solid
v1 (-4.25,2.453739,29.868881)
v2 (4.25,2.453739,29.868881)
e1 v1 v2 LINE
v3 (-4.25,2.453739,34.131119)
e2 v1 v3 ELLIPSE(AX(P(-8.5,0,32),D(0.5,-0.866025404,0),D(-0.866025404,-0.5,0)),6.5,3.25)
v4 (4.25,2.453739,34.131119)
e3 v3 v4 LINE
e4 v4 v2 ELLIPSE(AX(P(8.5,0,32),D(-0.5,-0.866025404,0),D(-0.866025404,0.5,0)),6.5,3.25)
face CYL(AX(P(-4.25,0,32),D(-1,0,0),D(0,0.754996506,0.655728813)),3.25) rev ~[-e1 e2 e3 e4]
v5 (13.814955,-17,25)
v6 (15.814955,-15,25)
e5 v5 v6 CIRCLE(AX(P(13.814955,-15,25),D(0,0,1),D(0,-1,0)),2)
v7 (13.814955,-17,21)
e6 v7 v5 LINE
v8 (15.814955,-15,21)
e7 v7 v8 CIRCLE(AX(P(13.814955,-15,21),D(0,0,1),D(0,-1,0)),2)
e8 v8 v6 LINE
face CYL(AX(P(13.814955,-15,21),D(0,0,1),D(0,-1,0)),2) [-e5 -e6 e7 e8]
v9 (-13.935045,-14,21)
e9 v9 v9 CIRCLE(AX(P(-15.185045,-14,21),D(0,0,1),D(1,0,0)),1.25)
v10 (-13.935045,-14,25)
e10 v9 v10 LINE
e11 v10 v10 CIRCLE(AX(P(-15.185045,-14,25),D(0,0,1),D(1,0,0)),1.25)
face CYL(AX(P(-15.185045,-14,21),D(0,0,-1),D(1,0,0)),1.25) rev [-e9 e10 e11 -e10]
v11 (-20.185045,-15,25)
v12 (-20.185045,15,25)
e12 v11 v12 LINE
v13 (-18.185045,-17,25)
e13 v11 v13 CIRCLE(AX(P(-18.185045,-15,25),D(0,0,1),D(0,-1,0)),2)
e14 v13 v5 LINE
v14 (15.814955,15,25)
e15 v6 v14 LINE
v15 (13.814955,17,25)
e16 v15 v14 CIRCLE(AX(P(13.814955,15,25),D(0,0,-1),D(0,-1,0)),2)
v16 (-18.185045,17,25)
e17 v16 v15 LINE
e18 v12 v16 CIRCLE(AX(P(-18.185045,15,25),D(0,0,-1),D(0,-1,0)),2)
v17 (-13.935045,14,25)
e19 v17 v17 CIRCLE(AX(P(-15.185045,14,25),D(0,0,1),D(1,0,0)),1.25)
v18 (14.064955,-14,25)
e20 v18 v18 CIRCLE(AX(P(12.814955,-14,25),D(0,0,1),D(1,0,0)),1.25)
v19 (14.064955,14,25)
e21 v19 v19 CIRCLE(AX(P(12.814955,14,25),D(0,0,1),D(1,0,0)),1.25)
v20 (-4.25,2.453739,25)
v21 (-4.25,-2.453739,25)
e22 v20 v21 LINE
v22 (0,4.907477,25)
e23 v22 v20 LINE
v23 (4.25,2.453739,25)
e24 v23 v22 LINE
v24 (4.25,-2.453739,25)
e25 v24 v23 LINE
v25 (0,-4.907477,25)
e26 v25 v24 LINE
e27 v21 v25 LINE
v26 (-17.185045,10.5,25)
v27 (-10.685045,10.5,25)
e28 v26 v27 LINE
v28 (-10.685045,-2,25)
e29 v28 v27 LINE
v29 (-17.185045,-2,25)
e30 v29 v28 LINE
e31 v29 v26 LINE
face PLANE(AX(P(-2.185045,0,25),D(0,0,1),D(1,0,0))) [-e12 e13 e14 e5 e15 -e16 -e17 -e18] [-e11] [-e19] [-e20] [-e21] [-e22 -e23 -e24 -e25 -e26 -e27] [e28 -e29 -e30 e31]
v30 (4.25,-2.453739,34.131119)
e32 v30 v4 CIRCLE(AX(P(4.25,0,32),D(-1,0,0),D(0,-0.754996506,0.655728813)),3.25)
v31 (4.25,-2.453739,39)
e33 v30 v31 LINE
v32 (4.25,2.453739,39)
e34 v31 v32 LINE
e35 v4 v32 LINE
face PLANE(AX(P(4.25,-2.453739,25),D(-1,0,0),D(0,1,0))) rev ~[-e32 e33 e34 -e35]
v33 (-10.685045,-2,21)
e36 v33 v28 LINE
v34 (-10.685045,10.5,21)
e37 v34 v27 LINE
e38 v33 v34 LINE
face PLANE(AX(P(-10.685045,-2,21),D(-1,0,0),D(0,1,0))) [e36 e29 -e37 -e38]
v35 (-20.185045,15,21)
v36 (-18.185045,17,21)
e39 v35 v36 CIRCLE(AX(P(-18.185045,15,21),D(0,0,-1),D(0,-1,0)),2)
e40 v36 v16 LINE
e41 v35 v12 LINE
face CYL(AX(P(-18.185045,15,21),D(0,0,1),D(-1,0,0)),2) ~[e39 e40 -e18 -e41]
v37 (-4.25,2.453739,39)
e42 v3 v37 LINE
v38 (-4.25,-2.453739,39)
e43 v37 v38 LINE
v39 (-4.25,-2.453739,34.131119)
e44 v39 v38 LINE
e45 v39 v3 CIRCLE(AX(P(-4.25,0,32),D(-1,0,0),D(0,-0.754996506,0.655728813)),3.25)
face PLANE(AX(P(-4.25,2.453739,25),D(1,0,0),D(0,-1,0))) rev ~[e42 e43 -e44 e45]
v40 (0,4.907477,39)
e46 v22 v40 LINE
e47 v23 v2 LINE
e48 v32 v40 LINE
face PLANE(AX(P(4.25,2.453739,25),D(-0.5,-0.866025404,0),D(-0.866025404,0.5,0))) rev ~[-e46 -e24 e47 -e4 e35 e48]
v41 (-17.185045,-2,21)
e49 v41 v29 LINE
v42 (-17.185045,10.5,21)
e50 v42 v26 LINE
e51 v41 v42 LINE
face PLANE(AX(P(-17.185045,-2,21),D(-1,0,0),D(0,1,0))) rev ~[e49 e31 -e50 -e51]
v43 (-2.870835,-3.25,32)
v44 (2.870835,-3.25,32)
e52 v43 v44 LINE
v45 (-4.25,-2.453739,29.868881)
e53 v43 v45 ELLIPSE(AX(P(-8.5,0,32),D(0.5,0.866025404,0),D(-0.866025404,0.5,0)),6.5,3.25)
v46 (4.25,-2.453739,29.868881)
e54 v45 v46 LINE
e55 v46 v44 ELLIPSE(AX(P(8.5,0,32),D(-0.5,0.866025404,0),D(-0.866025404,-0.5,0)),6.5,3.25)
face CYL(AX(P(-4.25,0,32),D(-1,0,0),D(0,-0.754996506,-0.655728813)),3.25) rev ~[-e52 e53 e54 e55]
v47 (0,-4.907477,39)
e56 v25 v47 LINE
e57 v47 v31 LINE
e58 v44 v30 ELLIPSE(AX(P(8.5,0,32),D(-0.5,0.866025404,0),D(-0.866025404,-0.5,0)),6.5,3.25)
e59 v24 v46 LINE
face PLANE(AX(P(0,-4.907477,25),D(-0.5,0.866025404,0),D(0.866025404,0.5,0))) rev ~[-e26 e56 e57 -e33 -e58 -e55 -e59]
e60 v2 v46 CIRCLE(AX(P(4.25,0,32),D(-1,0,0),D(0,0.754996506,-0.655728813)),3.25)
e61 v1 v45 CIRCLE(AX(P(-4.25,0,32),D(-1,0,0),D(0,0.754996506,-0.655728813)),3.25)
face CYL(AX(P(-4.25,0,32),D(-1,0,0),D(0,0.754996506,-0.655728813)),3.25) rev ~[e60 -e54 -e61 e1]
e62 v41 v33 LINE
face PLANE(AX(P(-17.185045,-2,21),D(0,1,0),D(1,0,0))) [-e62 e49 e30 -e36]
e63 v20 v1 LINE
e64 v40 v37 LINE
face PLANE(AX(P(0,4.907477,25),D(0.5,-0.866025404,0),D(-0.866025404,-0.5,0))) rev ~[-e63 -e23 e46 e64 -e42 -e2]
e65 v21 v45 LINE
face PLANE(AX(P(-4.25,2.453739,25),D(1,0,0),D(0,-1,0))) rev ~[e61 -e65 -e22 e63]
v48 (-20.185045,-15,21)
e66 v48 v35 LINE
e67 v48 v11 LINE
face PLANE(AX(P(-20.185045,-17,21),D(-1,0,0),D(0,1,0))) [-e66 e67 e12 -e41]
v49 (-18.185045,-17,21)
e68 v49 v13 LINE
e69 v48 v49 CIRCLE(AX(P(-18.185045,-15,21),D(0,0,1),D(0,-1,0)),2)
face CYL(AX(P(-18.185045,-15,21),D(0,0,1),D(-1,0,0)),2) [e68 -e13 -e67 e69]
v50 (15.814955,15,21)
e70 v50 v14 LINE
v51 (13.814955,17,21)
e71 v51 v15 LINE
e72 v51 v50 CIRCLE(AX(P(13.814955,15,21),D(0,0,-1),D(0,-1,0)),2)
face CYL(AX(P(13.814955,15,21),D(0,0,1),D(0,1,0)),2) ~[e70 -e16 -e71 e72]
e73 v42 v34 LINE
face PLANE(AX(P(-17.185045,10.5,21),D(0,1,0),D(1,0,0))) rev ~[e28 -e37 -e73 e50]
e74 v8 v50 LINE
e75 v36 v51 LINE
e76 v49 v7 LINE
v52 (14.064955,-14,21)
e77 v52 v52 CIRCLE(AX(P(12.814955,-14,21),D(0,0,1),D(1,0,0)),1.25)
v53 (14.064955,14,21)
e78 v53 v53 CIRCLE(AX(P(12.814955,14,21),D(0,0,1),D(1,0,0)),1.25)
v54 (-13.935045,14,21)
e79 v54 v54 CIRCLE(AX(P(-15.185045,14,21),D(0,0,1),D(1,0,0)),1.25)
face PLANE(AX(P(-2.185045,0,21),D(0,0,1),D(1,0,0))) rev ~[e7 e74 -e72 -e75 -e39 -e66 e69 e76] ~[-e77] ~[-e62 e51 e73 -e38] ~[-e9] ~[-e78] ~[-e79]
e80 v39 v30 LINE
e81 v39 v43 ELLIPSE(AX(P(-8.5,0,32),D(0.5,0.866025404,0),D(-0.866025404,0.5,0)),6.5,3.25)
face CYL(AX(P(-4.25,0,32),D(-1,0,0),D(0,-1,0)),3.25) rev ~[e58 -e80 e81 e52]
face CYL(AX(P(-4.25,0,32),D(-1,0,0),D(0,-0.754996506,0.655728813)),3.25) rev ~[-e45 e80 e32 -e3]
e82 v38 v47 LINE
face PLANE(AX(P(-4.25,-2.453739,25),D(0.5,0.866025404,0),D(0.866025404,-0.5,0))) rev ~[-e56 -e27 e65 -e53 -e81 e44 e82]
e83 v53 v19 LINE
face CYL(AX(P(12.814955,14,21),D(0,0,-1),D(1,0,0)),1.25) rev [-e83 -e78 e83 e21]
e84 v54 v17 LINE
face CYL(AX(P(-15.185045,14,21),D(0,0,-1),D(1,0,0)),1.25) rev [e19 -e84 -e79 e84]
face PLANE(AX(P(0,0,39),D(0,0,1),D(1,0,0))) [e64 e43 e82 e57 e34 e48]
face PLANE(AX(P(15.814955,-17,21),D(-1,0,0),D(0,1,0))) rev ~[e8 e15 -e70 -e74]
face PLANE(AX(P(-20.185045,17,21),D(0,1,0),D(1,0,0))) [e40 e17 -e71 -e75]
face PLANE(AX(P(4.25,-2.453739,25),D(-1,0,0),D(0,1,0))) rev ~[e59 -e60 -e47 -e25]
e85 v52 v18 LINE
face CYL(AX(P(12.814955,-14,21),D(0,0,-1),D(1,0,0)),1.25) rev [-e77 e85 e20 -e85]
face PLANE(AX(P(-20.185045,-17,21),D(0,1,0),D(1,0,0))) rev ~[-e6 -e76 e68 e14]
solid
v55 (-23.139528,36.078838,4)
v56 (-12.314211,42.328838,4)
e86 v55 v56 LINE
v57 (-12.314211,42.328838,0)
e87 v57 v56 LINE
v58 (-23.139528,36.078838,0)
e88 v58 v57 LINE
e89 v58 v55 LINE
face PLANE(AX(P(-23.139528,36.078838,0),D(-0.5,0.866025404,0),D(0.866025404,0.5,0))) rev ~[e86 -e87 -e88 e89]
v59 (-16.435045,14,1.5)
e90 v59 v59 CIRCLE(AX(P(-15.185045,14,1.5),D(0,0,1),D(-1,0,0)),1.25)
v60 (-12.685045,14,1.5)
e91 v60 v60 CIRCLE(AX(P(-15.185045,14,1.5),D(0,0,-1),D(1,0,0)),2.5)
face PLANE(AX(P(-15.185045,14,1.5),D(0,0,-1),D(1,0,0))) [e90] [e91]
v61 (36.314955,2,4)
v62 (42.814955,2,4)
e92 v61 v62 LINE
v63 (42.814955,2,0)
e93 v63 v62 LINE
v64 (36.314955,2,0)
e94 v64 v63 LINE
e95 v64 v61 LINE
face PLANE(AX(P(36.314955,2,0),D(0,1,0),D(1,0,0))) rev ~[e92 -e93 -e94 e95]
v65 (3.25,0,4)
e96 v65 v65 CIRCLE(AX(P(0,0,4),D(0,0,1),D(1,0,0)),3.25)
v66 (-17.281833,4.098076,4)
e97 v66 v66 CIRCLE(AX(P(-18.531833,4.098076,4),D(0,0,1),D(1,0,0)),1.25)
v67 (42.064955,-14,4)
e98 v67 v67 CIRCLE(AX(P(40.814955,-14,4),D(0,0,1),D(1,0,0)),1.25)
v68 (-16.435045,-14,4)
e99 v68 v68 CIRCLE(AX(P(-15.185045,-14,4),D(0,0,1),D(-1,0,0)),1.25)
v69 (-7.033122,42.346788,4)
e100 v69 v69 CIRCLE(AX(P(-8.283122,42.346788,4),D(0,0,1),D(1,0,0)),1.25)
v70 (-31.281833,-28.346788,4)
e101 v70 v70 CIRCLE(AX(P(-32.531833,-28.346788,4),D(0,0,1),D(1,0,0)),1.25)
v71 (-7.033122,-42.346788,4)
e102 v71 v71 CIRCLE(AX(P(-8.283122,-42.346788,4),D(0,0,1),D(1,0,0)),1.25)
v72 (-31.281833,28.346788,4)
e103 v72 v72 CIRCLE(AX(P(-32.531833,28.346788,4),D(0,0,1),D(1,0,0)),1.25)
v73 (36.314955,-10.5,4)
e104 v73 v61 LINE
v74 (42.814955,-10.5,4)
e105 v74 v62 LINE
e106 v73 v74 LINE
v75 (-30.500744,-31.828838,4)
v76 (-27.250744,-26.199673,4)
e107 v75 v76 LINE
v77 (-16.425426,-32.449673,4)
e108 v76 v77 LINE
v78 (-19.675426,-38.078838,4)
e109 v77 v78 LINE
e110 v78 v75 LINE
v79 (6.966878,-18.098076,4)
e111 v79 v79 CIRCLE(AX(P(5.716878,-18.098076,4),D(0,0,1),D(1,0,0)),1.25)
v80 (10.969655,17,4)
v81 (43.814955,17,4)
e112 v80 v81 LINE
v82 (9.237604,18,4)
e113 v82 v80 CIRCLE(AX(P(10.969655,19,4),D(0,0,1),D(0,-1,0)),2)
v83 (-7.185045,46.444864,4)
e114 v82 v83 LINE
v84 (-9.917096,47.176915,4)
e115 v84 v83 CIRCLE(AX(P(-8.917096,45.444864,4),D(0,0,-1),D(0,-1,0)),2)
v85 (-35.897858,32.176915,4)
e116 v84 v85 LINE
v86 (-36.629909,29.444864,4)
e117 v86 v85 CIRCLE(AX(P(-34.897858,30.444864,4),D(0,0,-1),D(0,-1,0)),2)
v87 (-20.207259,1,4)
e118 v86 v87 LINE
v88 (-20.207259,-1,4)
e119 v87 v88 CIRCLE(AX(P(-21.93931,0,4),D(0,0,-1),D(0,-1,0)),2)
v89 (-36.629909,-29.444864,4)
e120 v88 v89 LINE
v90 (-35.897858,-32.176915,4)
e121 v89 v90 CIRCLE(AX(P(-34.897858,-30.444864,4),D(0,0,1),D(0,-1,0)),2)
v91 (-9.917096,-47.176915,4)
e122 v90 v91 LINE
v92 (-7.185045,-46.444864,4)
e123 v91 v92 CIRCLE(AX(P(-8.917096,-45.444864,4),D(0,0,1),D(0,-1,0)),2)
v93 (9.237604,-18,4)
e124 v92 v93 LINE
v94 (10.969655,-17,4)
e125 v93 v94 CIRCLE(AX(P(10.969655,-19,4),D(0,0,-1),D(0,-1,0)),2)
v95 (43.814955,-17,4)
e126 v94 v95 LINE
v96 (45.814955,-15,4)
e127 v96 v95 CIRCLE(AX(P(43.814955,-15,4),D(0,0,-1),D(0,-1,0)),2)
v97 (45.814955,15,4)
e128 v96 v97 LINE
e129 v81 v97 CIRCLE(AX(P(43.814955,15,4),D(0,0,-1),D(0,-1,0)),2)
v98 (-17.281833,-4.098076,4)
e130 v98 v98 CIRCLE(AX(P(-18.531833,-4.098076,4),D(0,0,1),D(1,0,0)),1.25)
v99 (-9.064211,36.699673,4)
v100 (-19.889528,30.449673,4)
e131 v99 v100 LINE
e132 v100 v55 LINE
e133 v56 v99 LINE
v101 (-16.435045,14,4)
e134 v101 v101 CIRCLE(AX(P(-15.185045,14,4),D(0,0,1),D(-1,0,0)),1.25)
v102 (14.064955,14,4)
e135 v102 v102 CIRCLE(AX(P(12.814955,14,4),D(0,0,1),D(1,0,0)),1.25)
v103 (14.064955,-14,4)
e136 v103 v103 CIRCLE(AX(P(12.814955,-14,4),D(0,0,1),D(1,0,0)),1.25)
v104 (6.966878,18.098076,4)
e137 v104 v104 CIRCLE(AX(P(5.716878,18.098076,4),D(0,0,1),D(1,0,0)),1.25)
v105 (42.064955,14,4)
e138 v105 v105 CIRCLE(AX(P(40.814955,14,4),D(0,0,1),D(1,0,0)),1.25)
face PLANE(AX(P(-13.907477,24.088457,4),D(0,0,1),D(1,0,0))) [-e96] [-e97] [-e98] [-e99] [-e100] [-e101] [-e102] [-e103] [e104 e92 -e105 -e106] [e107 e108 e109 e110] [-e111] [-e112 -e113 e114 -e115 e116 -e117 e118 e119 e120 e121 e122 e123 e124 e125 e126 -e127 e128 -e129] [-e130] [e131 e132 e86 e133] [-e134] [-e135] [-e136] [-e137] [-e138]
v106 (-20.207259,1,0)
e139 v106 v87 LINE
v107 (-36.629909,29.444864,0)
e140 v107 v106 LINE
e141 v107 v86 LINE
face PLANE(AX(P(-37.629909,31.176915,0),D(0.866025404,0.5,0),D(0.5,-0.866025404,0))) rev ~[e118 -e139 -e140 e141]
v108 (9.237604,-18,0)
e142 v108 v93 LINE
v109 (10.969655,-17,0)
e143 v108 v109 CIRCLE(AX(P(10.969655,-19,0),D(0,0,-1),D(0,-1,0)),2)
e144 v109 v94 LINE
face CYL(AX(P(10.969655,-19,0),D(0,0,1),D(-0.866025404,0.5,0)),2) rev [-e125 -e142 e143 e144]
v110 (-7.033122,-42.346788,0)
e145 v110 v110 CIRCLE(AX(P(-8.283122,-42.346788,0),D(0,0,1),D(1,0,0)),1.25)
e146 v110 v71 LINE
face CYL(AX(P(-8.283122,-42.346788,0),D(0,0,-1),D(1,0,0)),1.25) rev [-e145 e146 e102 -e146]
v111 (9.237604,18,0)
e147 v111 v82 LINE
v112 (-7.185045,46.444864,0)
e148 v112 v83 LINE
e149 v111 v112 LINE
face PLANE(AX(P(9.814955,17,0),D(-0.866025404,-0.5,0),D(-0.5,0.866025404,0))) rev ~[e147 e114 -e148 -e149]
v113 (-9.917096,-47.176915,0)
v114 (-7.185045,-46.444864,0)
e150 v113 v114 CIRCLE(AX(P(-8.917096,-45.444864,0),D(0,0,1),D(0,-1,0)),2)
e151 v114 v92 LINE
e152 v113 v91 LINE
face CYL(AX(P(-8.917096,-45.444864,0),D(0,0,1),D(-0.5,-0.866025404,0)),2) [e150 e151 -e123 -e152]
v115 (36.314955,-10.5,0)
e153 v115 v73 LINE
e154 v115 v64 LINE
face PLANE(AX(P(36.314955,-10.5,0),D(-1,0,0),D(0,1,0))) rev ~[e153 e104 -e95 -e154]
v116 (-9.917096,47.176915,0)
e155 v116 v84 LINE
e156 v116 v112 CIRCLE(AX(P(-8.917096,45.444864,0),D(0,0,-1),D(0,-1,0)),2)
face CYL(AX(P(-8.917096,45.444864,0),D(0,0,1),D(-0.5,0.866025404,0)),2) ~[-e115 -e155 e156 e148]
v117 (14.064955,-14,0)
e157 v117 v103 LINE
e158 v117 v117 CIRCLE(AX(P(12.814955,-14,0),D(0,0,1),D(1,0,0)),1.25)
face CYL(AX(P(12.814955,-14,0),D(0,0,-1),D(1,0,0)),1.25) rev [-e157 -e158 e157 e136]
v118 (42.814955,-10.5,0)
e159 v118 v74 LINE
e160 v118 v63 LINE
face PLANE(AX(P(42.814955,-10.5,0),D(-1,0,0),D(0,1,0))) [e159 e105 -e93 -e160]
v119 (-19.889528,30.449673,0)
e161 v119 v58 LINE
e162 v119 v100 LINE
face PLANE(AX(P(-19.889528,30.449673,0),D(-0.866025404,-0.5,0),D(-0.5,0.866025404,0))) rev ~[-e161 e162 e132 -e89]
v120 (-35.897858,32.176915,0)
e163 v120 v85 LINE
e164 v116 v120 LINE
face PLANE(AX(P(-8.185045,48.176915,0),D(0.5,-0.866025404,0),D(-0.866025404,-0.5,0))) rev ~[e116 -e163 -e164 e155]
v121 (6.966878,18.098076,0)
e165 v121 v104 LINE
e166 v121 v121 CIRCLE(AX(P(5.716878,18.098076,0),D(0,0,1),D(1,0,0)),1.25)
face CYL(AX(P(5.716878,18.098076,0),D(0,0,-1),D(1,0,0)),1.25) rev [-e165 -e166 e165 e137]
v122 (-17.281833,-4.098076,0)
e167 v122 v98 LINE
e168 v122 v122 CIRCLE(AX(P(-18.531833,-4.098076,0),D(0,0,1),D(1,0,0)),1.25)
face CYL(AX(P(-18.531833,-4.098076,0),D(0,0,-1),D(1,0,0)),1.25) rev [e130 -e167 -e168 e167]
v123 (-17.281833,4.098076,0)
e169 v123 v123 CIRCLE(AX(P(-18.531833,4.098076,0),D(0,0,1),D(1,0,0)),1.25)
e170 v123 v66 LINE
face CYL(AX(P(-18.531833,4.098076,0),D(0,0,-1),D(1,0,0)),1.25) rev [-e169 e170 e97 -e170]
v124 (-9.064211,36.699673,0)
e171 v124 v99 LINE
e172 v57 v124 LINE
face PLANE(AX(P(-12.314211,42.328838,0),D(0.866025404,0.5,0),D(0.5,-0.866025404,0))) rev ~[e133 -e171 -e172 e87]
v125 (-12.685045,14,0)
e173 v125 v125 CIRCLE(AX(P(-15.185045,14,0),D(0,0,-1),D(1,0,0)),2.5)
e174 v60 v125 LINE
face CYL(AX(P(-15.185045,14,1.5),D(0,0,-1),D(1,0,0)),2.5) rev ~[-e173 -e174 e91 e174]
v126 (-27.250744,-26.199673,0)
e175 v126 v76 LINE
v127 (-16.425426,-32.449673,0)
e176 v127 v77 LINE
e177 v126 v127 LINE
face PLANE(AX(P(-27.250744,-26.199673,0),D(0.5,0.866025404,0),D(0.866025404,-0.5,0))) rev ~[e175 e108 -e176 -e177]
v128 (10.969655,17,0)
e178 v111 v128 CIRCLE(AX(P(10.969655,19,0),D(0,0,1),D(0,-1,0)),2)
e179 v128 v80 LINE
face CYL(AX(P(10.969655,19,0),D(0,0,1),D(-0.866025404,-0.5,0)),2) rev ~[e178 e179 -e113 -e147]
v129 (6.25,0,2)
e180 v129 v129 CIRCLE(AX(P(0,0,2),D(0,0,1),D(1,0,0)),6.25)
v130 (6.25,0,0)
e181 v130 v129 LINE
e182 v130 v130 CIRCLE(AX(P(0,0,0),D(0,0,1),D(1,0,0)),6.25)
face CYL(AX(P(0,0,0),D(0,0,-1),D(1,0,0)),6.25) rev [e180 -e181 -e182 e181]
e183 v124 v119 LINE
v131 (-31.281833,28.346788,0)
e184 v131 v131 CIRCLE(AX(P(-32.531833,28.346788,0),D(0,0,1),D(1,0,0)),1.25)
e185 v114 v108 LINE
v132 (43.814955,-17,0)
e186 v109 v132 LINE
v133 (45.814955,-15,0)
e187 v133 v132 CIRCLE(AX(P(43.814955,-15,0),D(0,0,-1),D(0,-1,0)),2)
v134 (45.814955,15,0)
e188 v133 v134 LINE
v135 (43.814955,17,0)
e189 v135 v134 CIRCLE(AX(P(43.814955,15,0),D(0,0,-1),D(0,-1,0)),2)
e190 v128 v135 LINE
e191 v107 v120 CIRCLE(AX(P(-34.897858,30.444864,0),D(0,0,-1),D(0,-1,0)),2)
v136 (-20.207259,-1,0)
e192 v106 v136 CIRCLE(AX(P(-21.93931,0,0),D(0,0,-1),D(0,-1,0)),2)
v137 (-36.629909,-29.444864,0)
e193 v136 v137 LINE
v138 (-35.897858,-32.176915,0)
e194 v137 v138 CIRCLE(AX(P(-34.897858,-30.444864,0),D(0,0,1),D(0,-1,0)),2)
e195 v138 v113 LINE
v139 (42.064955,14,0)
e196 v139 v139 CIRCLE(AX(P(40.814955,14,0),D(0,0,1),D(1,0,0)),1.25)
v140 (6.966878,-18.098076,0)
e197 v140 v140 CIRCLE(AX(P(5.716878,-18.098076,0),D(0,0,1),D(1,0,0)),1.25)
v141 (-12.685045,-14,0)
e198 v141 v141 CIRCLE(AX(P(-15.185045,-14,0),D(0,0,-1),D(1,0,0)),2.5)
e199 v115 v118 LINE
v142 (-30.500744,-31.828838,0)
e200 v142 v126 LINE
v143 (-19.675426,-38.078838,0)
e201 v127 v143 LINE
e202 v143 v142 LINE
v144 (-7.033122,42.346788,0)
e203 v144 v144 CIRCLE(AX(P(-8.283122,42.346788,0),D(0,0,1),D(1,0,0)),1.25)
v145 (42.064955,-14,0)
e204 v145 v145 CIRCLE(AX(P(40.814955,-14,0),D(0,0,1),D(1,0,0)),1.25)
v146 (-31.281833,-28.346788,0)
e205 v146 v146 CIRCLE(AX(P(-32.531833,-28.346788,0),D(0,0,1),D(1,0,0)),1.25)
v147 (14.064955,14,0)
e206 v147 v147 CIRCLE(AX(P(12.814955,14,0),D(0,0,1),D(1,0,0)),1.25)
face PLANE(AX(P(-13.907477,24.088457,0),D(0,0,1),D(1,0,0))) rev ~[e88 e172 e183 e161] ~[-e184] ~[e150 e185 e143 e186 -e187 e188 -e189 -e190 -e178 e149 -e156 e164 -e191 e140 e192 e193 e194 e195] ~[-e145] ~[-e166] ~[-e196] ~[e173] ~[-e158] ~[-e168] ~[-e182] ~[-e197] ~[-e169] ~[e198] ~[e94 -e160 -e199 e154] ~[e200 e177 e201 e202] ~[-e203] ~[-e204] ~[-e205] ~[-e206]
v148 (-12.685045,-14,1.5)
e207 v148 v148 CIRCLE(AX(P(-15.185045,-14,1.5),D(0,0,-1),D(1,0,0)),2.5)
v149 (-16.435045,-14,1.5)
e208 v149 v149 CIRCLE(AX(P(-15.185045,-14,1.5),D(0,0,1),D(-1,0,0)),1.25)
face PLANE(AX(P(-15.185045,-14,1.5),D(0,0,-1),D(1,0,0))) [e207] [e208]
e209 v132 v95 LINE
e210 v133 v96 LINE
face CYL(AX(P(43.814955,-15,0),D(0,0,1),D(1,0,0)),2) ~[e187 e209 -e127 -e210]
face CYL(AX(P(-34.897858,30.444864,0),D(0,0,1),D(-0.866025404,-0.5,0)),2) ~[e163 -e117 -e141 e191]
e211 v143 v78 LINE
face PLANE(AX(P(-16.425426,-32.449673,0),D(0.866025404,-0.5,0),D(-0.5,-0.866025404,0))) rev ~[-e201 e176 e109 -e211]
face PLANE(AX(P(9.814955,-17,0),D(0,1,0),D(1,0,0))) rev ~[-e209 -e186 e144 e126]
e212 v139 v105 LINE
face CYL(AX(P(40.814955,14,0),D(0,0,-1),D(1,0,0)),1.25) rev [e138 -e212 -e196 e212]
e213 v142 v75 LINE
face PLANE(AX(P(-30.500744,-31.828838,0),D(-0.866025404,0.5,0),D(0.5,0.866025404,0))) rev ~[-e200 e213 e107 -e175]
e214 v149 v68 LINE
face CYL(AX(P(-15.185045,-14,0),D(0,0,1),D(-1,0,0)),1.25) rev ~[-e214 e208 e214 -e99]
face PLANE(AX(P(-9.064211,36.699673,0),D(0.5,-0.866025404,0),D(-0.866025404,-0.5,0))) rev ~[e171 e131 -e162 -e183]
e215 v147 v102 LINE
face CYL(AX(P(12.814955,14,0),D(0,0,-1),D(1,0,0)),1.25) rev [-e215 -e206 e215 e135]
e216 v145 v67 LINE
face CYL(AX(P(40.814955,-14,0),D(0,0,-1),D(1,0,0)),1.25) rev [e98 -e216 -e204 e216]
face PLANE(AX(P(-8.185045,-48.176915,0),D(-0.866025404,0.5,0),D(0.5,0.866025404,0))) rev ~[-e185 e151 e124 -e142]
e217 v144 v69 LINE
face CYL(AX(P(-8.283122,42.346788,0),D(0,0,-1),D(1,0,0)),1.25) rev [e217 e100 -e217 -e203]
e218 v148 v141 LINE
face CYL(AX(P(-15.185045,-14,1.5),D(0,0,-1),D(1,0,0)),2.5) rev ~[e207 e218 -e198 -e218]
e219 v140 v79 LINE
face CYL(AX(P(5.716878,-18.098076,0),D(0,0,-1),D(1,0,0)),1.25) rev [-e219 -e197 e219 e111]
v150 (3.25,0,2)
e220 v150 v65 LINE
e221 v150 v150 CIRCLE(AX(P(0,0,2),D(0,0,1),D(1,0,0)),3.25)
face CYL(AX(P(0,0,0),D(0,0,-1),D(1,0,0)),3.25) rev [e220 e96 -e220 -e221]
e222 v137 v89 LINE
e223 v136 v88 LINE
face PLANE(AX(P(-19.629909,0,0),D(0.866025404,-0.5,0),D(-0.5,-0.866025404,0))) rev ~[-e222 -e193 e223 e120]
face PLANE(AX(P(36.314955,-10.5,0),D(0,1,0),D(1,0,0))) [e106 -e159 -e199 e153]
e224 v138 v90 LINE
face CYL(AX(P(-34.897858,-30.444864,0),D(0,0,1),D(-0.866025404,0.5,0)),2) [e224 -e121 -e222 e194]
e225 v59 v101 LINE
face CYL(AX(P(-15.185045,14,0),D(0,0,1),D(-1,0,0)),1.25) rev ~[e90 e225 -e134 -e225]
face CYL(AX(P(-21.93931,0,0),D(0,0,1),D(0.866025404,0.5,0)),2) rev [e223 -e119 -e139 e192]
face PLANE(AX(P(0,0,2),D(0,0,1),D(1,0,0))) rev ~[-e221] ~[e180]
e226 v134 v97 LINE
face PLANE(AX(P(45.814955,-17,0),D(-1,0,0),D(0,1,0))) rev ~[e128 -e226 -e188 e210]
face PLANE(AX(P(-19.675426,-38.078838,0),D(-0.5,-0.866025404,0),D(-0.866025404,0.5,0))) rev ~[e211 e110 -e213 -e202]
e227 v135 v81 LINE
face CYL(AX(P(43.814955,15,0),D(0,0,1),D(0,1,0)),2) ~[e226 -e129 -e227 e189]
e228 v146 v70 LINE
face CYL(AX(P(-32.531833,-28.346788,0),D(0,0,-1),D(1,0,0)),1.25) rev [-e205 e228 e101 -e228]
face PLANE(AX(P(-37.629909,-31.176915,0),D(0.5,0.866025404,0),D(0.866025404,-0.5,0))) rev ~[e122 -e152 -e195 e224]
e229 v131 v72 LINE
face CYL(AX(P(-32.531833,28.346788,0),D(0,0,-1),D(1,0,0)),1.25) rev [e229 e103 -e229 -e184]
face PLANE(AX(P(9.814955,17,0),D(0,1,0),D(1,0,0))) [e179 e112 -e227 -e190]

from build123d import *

# Parameters (mm, degrees)
F0_R           = 1.25
F0_W           = 36
F0_H           = 34
F0_W_2         = 6.5
F0_H_2         = 12.5
F0_R_2         = 6.25
F0_R_3         = 3.25
F1_DEPTH       = 4
F2_DEPTH       = 2
F3_R           = 2
F5_START       = 21
F4_W           = 36
F4_H           = 34
F4_R           = 1.25
F4_W_2         = 6.5
F4_H_2         = 12.5
F5_DEPTH       = 4
F6_D           = 2.5
F6_CBORE_D     = 5
F6_CBORE_DEPTH = 1.5
F8_DEPTH       = 14
F10_DEPTH      = 25
F11_R          = 2


with BuildPart() as f1:
    # F0 (on Top) → F1 (new body)
    with BuildSketch(Plane.XY):
        Polygon((-19.6299091524, 0), (9.8149545762, 17), (-8.1850454238, 48.1769145362), (-37.6299091524, 31.1769145362), align=None)
        with Locations((-18.5318329411, 4.0980762114)):
            Circle(F0_R, mode=Mode.SUBTRACT)
        with Locations((-32.5318329411, 28.3467875173)):
            Circle(F0_R, mode=Mode.SUBTRACT)
        Polygon((-9.0642105484, 36.6996732003), (-19.8895280957, 30.4496732003), (-23.1395280957, 36.0788383249), (-12.3142105484, 42.3288383249), align=None, mode=Mode.SUBTRACT)
        with Locations((-8.2831216351, 42.3467875173)):
            Circle(F0_R, mode=Mode.SUBTRACT)
        with Locations((5.7168783649, 18.0980762114)):
            Circle(F0_R, mode=Mode.SUBTRACT)
        with Locations((27.8149545762, 0)):
            Rectangle(F0_W, F0_H)
        with Locations((12.8149545762, -14)):
            Circle(F0_R, mode=Mode.SUBTRACT)
        with Locations((40.8149545762, -14)):
            Circle(F0_R, mode=Mode.SUBTRACT)
        with Locations((39.5649545762, -4.25)):
            Rectangle(F0_W_2, F0_H_2, mode=Mode.SUBTRACT)
        with Locations((12.8149545762, 14)):
            Circle(F0_R, mode=Mode.SUBTRACT)
        with Locations((40.8149545762, 14)):
            Circle(F0_R, mode=Mode.SUBTRACT)
        Polygon((-8.1850454238, -48.1769145362), (9.8149545762, -17), (-19.6299091524, 0), (-37.6299091524, -31.1769145362), align=None)
        with Locations((-32.5318329411, -28.3467875173)):
            Circle(F0_R, mode=Mode.SUBTRACT)
        Polygon((-27.2507440278, -26.1996732003), (-16.4254264805, -32.4496732003), (-19.6754264805, -38.0788383249), (-30.5007440278, -31.8288383249), align=None, mode=Mode.SUBTRACT)
        with Locations((-8.2831216351, -42.3467875173)):
            Circle(F0_R, mode=Mode.SUBTRACT)
        with Locations((-18.5318329411, -4.0980762114)):
            Circle(F0_R, mode=Mode.SUBTRACT)
        with Locations((5.7168783649, -18.0980762114)):
            Circle(F0_R, mode=Mode.SUBTRACT)
        Polygon((9.8149545762, -17), (9.8149545762, 17), (-19.6299091524, 0), align=None)
        Circle(F0_R_2, mode=Mode.SUBTRACT)
        Circle(F0_R_2)
        Circle(F0_R_3, mode=Mode.SUBTRACT)
    extrude(amount=F1_DEPTH)

    # F0 (on Top) → F2 (cut)
    with BuildSketch(Plane.XY):
        Circle(F0_R_2)
        Circle(F0_R_3, mode=Mode.SUBTRACT)
    extrude(amount=F2_DEPTH, mode=Mode.SUBTRACT)

    # F3
    f3_edges = [f1.edges().sort_by_distance(p)[0] for p in [
        (-8.185045, 48.176915, 2),
        (45.814955, 17, 2),
        (45.814955, -17, 2),
        (9.814955, -17, 2),
        (-8.185045, -48.176915, 2),
        (-37.629909, -31.176915, 2),
        (-19.629909, 0, 2),
        (-37.629909, 31.176915, 2),
        (9.814955, 17, 2),
    ]]
    fillet(f3_edges, radius=F3_R)

    # F6 (through all)
    with Locations(Plane(origin=(0, 0, 0), x_dir=(1, 0, 0), z_dir=(0, 0, -1))):
        with Locations((-15.1850454238, -14), (-15.1850454238, 14)):
            CounterBoreHole(F6_D / 2, F6_CBORE_D / 2, F6_CBORE_DEPTH)


with BuildPart() as f5:
    # F4 (on Top) → F5 (new body)
    with BuildSketch(Plane.XY.offset(F5_START)):
        with Locations((-2.1850454238, 0)):
            Rectangle(F4_W, F4_H)
        with Locations((-15.1850454238, -14)):
            Circle(F4_R, mode=Mode.SUBTRACT)
        with Locations((12.8149545762, -14)):
            Circle(F4_R, mode=Mode.SUBTRACT)
        with Locations((-13.9350454238, 4.25)):
            Rectangle(F4_W_2, F4_H_2, mode=Mode.SUBTRACT)
        with Locations((-15.1850454238, 14)):
            Circle(F4_R, mode=Mode.SUBTRACT)
        with Locations((12.8149545762, 14)):
            Circle(F4_R, mode=Mode.SUBTRACT)
    extrude(amount=F5_DEPTH)

    # F7 (on face) → F8 (join)
    with BuildSketch(Plane.XY.offset(25)):
        Polygon((4.25, -2.4537386441), (4.25, 2.4537386441), (0, 4.9074772881), (-4.25, 2.4537386441), (-4.25, -2.4537386441), (0, -4.9074772881), align=None)
    extrude(amount=F8_DEPTH)

    # F9 (on face) → F10 (cut)
    with BuildSketch(Plane(origin=(-4.25, 0, 0), x_dir=(0, -1, 0), z_dir=(-1, 0, 0))):
        with BuildLine():
            Line((2.4537386441, 29.8688813579), (2.4537386441, 34.1311186421))
            ThreePointArc((2.4537386441, 34.1311186421), (0, 35.25), (-2.4537386441, 34.1311186421))
            Line((-2.4537386441, 34.1311186421), (-2.4537386441, 29.8688813579))
            ThreePointArc((-2.4537386441, 29.8688813579), (0, 28.75), (2.4537386441, 29.8688813579))
        make_face()
        with BuildLine():
            Line((-2.4537386441, 29.8688813579), (-2.4537386441, 34.1311186421))
            ThreePointArc((-2.4537386441, 34.1311186421), (-3.25, 32), (-2.4537386441, 29.8688813579))
        make_face()
        with BuildLine():
            ThreePointArc((2.4537386441, 29.8688813579), (3.0444334935, 30.8624918886), (3.25, 32))
            ThreePointArc((3.25, 32), (3.0444334935, 33.1375081114), (2.4537386441, 34.1311186421))
            Line((2.4537386441, 34.1311186421), (2.4537386441, 29.8688813579))
        make_face()
    extrude(amount=-F10_DEPTH, mode=Mode.SUBTRACT)

    # F11
    f11_edges = [f5.edges().sort_by_distance(p)[0] for p in [
        (15.814955, -17, 23),
        (15.814955, 17, 23),
        (-20.185045, 17, 23),
        (-20.185045, -17, 23),
    ]]
    fillet(f11_edges, radius=F11_R)


solid = Compound([f1.part, f5.part])
